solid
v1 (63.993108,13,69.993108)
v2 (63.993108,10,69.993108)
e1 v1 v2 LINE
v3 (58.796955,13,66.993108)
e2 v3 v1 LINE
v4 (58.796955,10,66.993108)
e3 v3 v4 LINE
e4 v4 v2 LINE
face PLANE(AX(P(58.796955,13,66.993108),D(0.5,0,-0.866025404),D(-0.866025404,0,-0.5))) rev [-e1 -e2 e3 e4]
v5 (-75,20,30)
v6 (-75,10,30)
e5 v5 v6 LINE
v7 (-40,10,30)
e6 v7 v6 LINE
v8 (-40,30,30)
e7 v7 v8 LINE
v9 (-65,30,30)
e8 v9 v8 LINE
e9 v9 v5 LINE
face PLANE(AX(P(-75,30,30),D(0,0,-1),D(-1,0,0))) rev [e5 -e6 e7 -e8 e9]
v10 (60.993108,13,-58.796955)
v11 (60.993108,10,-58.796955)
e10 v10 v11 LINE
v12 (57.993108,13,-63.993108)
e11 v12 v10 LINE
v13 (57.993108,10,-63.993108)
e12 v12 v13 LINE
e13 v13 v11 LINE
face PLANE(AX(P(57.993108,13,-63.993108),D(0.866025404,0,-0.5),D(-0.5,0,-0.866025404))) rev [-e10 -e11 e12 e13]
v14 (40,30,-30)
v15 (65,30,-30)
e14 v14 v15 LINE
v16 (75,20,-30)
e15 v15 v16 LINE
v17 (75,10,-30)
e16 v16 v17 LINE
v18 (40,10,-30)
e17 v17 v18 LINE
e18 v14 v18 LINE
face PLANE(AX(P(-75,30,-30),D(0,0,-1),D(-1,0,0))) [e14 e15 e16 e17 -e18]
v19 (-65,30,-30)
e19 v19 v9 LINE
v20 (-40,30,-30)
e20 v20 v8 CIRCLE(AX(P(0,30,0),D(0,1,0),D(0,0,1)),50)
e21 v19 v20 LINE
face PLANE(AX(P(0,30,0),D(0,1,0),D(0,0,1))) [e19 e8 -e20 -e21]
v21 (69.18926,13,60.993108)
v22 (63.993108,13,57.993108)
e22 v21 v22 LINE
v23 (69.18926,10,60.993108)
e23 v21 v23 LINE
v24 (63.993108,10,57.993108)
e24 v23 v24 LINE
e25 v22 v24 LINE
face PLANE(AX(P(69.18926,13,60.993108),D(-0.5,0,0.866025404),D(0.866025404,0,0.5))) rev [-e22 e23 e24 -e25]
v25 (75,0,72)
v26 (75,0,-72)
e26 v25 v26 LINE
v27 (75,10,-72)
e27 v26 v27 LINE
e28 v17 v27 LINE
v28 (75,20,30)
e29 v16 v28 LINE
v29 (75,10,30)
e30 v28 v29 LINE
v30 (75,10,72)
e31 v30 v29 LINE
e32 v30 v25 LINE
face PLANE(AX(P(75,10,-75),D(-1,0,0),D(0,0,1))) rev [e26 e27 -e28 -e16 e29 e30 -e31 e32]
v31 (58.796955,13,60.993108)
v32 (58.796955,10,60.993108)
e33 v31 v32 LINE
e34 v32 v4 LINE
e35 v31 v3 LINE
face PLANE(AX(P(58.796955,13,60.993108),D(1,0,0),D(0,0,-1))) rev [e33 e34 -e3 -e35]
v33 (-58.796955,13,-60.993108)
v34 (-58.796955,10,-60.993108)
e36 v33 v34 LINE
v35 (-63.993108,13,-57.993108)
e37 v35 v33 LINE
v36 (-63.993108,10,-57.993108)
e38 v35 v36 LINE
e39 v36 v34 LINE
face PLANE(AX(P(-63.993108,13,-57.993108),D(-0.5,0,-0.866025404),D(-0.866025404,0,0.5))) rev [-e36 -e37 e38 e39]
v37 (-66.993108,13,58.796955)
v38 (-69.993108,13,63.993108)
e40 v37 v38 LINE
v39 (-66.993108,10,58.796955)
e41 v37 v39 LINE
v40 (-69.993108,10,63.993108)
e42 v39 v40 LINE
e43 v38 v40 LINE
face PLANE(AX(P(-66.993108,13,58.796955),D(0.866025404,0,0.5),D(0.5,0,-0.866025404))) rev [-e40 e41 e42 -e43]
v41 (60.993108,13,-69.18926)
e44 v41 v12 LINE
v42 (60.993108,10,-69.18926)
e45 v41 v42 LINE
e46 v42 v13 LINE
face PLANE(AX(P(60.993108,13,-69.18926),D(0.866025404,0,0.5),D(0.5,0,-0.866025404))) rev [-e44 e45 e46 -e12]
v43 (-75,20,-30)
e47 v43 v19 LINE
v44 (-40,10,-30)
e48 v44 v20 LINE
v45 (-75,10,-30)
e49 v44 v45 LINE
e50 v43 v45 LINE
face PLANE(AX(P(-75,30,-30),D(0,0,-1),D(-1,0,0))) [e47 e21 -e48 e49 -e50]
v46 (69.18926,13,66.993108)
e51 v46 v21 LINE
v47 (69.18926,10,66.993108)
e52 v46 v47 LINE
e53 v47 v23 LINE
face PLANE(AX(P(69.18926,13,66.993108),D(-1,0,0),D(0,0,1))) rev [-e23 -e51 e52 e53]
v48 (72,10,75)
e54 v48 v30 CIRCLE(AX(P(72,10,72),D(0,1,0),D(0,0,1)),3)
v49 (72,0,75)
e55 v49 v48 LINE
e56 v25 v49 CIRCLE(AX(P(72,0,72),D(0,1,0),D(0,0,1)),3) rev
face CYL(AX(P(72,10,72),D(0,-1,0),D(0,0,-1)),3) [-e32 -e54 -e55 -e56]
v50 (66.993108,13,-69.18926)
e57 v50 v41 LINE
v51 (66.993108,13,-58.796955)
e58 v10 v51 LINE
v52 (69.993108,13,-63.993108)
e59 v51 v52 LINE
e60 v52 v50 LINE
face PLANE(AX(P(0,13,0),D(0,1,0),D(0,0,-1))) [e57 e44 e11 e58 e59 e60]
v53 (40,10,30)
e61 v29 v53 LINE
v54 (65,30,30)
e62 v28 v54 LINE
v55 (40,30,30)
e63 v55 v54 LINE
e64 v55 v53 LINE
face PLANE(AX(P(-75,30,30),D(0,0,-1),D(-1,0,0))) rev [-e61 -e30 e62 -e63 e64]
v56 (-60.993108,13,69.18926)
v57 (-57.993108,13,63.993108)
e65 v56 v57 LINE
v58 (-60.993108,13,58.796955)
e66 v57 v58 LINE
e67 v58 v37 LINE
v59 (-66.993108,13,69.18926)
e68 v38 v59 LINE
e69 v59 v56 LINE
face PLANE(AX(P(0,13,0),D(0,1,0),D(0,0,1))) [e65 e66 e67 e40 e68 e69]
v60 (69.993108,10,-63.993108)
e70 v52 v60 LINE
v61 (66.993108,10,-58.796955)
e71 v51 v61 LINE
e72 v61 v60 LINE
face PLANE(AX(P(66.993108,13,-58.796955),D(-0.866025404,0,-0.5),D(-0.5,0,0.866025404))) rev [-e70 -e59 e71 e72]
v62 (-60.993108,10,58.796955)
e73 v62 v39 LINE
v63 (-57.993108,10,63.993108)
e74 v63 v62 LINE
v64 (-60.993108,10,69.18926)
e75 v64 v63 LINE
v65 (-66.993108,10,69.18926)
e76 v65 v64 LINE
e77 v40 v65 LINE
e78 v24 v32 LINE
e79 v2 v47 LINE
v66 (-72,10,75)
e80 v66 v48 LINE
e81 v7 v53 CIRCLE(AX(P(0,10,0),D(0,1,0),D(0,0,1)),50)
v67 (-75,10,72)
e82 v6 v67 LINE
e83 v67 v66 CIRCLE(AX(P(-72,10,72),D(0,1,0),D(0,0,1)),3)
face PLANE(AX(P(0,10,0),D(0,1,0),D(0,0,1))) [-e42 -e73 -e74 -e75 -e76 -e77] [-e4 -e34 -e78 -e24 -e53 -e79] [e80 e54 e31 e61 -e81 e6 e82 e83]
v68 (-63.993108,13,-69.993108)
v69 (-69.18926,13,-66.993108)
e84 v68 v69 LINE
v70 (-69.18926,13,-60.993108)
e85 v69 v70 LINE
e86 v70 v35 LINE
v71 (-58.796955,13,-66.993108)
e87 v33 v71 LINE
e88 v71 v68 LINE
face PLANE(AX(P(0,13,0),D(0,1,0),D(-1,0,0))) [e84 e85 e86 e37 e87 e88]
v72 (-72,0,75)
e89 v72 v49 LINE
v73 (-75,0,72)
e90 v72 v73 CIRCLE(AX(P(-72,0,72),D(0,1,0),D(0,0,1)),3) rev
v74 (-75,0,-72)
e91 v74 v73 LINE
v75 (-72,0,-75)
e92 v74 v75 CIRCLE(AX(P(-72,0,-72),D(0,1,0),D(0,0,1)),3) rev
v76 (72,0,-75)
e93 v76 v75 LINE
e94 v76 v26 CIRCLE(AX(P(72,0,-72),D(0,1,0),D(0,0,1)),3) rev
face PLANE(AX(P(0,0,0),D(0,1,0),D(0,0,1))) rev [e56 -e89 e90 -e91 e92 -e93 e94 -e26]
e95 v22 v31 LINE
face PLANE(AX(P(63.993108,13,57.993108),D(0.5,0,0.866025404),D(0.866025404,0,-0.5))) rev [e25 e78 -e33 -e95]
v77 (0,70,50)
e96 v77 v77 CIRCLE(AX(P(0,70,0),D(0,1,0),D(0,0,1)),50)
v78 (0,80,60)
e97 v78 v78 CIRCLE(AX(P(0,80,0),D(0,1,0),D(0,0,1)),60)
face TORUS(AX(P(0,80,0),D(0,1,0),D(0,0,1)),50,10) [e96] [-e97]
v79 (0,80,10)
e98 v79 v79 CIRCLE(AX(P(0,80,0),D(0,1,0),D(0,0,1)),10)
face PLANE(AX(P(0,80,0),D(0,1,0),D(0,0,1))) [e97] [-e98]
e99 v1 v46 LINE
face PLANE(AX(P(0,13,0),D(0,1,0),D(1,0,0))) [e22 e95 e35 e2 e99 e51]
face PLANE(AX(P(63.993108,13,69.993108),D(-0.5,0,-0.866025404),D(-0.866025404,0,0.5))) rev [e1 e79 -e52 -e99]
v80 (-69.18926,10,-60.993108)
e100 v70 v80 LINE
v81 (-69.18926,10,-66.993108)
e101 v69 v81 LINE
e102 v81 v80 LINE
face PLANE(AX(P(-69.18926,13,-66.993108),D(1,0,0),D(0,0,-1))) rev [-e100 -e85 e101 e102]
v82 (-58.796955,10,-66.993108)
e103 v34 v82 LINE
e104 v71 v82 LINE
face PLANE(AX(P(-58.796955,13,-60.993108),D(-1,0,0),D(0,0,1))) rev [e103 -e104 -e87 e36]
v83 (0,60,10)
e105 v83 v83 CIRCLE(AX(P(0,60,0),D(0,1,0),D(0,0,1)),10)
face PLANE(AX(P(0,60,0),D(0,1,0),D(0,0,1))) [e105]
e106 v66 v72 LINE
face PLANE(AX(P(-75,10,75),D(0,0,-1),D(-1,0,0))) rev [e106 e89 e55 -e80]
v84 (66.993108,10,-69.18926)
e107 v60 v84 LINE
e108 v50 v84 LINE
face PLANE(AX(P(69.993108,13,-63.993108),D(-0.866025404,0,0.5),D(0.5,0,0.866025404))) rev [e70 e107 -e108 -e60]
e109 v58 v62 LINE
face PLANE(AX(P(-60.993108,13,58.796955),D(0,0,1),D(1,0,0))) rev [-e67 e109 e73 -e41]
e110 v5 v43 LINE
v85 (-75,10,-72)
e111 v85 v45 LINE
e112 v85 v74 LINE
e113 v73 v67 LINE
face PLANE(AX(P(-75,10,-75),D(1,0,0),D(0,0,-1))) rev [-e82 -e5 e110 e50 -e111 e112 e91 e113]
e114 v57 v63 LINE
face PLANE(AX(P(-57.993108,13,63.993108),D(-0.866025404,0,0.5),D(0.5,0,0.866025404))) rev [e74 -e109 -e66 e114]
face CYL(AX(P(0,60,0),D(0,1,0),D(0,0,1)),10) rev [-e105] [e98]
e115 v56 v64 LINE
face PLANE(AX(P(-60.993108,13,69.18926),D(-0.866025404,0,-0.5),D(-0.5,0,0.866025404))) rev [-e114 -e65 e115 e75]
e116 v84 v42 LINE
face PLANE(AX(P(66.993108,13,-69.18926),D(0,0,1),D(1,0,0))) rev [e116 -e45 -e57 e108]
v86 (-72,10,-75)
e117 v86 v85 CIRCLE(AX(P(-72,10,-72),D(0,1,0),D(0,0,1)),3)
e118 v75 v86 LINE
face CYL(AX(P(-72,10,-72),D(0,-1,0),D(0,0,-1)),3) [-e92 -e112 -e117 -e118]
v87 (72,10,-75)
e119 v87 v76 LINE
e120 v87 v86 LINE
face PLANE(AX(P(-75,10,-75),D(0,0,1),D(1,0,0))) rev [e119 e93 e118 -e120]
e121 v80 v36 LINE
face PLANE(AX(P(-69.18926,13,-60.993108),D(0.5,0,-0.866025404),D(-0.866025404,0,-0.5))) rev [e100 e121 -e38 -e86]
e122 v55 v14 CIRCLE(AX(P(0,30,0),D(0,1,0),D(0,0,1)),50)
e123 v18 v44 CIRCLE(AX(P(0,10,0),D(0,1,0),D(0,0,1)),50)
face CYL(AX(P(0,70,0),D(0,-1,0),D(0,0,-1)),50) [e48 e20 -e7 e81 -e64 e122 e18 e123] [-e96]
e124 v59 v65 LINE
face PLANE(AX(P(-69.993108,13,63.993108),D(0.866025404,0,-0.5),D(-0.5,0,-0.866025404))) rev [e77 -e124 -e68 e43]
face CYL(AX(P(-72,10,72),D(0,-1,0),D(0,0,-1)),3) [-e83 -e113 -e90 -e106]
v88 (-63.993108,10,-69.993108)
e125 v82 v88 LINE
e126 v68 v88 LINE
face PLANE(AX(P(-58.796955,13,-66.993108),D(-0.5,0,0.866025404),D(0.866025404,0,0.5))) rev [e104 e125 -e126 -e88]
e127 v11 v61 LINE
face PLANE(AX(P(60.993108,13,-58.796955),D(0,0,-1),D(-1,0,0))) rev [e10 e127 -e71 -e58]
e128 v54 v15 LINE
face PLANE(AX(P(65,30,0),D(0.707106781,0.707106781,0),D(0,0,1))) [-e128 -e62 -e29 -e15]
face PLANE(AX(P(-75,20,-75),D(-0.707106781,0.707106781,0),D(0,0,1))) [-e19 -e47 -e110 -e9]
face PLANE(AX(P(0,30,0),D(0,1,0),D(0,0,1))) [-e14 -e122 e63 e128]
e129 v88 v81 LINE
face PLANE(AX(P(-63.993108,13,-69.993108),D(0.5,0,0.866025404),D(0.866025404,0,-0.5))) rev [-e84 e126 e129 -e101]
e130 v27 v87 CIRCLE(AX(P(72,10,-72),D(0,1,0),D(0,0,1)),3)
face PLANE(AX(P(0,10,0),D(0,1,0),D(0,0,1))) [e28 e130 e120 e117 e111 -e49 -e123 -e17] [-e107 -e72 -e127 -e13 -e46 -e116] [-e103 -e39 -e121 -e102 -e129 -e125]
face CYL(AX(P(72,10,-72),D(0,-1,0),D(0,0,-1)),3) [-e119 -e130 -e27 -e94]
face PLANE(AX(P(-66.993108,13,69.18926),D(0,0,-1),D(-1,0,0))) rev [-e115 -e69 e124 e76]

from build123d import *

# Parameters (mm, degrees)
SKETCH1_W           = 150
SKETCH1_H           = 150
BOSS_EXTRUDE1_DEPTH = 10
SKETCH2_R           = 50
BOSS_EXTRUDE2_DEPTH = 60
SKETCH3_R           = 60
BOSS_EXTRUDE3_DEPTH = 10
SKETCH7_W           = 150
SKETCH7_H           = 60
BOSS_EXTRUDE6_DEPTH = 30
SKETCH8_R           = 10
CUT_EXTRUDE2_DEPTH  = 20
FILLET3_R           = 10
FILLET4_R           = 3
CHAMFER1_SIZE       = 10
BOSS_EXTRUDE7_DEPTH = 3
CIRPATTERN1_COUNT   = 4


with BuildPart() as part:
    # Sketch1 → Boss-Extrude1 (new body)
    with BuildSketch(Plane(origin=(0, 0, 0), x_dir=(1, 0, 0), z_dir=(0, 1, 0))):
        Rectangle(SKETCH1_W, SKETCH1_H)
    extrude(amount=BOSS_EXTRUDE1_DEPTH)

    # Sketch2 → Boss-Extrude2 (add)
    with BuildSketch(Plane(origin=(0, 10, 0), x_dir=(1, 0, 0), z_dir=(0, 1, 0))):
        with Locations(Location((0, 0, 0), (0, 0, 270))):
            Circle(SKETCH2_R)
    extrude(amount=BOSS_EXTRUDE2_DEPTH)

    # Sketch3 → Boss-Extrude3 (add)
    with BuildSketch(Plane(origin=(0, 70, 0), x_dir=(1, 0, 0), z_dir=(0, 1, 0))):
        with Locations(Location((0, 0, 0), (0, 0, 270))):
            Circle(SKETCH3_R)
    extrude(amount=BOSS_EXTRUDE3_DEPTH)

    # Sketch7 → Boss-Extrude6 (add)
    with BuildSketch(Plane(origin=(0, 0, 0), x_dir=(-1, 0, 0), z_dir=(0, -1, 0))):
        Rectangle(SKETCH7_W, SKETCH7_H)
    extrude(amount=-BOSS_EXTRUDE6_DEPTH)

    # Sketch8 → Cut-Extrude2 (cut)
    with BuildSketch(Plane(origin=(0, 80, 0), x_dir=(1, 0, 0), z_dir=(0, 1, 0))):
        with Locations(Location((0, 0, 0), (0, 0, 270))):
            Circle(SKETCH8_R)
    extrude(amount=-CUT_EXTRUDE2_DEPTH, mode=Mode.SUBTRACT)

    # Fillet3
    fillet3_edges = [part.edges().sort_by_distance(p)[0] for p in [
        (0, 70, -60),
    ]]
    fillet(fillet3_edges, radius=FILLET3_R - 0.0001)  # a hair under: the kernel refuses the full size

    # Fillet4
    fillet4_edges = [part.edges().sort_by_distance(p)[0] for p in [
        (75, 5, 75),
        (-75, 5, 75),
        (-75, 5, -75),
        (75, 5, -75),
    ]]
    fillet(fillet4_edges, radius=FILLET4_R)

    # Chamfer1
    chamfer1_edges = [part.edges().sort_by_distance(p)[0] for p in [
        (75, 30, 0),
        (-75, 30, 0),
    ]]
    chamfer(chamfer1_edges, length=CHAMFER1_SIZE)

    # Sketch9 → Boss-Extrude7 (add)
    with BuildSketch(Plane(origin=(0, 10, 0), x_dir=(1, 0, 0), z_dir=(0, 1, 0))):
        Polygon((-57.993107668, -63.993107668), (-60.993107668, -58.796955246), (-66.993107668, -58.796955246), (-69.993107668, -63.993107668), (-66.993107668, -69.189260091), (-60.993107668, -69.189260091), align=None)
    boss_extrude7 = extrude(amount=BOSS_EXTRUDE7_DEPTH)

    # CirPattern1: Boss-Extrude7 ×4 about axis
    cirpattern1_axis = Axis((0, 0, 0), (0, 1, 0))
    for i in range(1, CIRPATTERN1_COUNT):
        add(boss_extrude7.rotate(cirpattern1_axis, i * 360 / CIRPATTERN1_COUNT))


solid = part.part
